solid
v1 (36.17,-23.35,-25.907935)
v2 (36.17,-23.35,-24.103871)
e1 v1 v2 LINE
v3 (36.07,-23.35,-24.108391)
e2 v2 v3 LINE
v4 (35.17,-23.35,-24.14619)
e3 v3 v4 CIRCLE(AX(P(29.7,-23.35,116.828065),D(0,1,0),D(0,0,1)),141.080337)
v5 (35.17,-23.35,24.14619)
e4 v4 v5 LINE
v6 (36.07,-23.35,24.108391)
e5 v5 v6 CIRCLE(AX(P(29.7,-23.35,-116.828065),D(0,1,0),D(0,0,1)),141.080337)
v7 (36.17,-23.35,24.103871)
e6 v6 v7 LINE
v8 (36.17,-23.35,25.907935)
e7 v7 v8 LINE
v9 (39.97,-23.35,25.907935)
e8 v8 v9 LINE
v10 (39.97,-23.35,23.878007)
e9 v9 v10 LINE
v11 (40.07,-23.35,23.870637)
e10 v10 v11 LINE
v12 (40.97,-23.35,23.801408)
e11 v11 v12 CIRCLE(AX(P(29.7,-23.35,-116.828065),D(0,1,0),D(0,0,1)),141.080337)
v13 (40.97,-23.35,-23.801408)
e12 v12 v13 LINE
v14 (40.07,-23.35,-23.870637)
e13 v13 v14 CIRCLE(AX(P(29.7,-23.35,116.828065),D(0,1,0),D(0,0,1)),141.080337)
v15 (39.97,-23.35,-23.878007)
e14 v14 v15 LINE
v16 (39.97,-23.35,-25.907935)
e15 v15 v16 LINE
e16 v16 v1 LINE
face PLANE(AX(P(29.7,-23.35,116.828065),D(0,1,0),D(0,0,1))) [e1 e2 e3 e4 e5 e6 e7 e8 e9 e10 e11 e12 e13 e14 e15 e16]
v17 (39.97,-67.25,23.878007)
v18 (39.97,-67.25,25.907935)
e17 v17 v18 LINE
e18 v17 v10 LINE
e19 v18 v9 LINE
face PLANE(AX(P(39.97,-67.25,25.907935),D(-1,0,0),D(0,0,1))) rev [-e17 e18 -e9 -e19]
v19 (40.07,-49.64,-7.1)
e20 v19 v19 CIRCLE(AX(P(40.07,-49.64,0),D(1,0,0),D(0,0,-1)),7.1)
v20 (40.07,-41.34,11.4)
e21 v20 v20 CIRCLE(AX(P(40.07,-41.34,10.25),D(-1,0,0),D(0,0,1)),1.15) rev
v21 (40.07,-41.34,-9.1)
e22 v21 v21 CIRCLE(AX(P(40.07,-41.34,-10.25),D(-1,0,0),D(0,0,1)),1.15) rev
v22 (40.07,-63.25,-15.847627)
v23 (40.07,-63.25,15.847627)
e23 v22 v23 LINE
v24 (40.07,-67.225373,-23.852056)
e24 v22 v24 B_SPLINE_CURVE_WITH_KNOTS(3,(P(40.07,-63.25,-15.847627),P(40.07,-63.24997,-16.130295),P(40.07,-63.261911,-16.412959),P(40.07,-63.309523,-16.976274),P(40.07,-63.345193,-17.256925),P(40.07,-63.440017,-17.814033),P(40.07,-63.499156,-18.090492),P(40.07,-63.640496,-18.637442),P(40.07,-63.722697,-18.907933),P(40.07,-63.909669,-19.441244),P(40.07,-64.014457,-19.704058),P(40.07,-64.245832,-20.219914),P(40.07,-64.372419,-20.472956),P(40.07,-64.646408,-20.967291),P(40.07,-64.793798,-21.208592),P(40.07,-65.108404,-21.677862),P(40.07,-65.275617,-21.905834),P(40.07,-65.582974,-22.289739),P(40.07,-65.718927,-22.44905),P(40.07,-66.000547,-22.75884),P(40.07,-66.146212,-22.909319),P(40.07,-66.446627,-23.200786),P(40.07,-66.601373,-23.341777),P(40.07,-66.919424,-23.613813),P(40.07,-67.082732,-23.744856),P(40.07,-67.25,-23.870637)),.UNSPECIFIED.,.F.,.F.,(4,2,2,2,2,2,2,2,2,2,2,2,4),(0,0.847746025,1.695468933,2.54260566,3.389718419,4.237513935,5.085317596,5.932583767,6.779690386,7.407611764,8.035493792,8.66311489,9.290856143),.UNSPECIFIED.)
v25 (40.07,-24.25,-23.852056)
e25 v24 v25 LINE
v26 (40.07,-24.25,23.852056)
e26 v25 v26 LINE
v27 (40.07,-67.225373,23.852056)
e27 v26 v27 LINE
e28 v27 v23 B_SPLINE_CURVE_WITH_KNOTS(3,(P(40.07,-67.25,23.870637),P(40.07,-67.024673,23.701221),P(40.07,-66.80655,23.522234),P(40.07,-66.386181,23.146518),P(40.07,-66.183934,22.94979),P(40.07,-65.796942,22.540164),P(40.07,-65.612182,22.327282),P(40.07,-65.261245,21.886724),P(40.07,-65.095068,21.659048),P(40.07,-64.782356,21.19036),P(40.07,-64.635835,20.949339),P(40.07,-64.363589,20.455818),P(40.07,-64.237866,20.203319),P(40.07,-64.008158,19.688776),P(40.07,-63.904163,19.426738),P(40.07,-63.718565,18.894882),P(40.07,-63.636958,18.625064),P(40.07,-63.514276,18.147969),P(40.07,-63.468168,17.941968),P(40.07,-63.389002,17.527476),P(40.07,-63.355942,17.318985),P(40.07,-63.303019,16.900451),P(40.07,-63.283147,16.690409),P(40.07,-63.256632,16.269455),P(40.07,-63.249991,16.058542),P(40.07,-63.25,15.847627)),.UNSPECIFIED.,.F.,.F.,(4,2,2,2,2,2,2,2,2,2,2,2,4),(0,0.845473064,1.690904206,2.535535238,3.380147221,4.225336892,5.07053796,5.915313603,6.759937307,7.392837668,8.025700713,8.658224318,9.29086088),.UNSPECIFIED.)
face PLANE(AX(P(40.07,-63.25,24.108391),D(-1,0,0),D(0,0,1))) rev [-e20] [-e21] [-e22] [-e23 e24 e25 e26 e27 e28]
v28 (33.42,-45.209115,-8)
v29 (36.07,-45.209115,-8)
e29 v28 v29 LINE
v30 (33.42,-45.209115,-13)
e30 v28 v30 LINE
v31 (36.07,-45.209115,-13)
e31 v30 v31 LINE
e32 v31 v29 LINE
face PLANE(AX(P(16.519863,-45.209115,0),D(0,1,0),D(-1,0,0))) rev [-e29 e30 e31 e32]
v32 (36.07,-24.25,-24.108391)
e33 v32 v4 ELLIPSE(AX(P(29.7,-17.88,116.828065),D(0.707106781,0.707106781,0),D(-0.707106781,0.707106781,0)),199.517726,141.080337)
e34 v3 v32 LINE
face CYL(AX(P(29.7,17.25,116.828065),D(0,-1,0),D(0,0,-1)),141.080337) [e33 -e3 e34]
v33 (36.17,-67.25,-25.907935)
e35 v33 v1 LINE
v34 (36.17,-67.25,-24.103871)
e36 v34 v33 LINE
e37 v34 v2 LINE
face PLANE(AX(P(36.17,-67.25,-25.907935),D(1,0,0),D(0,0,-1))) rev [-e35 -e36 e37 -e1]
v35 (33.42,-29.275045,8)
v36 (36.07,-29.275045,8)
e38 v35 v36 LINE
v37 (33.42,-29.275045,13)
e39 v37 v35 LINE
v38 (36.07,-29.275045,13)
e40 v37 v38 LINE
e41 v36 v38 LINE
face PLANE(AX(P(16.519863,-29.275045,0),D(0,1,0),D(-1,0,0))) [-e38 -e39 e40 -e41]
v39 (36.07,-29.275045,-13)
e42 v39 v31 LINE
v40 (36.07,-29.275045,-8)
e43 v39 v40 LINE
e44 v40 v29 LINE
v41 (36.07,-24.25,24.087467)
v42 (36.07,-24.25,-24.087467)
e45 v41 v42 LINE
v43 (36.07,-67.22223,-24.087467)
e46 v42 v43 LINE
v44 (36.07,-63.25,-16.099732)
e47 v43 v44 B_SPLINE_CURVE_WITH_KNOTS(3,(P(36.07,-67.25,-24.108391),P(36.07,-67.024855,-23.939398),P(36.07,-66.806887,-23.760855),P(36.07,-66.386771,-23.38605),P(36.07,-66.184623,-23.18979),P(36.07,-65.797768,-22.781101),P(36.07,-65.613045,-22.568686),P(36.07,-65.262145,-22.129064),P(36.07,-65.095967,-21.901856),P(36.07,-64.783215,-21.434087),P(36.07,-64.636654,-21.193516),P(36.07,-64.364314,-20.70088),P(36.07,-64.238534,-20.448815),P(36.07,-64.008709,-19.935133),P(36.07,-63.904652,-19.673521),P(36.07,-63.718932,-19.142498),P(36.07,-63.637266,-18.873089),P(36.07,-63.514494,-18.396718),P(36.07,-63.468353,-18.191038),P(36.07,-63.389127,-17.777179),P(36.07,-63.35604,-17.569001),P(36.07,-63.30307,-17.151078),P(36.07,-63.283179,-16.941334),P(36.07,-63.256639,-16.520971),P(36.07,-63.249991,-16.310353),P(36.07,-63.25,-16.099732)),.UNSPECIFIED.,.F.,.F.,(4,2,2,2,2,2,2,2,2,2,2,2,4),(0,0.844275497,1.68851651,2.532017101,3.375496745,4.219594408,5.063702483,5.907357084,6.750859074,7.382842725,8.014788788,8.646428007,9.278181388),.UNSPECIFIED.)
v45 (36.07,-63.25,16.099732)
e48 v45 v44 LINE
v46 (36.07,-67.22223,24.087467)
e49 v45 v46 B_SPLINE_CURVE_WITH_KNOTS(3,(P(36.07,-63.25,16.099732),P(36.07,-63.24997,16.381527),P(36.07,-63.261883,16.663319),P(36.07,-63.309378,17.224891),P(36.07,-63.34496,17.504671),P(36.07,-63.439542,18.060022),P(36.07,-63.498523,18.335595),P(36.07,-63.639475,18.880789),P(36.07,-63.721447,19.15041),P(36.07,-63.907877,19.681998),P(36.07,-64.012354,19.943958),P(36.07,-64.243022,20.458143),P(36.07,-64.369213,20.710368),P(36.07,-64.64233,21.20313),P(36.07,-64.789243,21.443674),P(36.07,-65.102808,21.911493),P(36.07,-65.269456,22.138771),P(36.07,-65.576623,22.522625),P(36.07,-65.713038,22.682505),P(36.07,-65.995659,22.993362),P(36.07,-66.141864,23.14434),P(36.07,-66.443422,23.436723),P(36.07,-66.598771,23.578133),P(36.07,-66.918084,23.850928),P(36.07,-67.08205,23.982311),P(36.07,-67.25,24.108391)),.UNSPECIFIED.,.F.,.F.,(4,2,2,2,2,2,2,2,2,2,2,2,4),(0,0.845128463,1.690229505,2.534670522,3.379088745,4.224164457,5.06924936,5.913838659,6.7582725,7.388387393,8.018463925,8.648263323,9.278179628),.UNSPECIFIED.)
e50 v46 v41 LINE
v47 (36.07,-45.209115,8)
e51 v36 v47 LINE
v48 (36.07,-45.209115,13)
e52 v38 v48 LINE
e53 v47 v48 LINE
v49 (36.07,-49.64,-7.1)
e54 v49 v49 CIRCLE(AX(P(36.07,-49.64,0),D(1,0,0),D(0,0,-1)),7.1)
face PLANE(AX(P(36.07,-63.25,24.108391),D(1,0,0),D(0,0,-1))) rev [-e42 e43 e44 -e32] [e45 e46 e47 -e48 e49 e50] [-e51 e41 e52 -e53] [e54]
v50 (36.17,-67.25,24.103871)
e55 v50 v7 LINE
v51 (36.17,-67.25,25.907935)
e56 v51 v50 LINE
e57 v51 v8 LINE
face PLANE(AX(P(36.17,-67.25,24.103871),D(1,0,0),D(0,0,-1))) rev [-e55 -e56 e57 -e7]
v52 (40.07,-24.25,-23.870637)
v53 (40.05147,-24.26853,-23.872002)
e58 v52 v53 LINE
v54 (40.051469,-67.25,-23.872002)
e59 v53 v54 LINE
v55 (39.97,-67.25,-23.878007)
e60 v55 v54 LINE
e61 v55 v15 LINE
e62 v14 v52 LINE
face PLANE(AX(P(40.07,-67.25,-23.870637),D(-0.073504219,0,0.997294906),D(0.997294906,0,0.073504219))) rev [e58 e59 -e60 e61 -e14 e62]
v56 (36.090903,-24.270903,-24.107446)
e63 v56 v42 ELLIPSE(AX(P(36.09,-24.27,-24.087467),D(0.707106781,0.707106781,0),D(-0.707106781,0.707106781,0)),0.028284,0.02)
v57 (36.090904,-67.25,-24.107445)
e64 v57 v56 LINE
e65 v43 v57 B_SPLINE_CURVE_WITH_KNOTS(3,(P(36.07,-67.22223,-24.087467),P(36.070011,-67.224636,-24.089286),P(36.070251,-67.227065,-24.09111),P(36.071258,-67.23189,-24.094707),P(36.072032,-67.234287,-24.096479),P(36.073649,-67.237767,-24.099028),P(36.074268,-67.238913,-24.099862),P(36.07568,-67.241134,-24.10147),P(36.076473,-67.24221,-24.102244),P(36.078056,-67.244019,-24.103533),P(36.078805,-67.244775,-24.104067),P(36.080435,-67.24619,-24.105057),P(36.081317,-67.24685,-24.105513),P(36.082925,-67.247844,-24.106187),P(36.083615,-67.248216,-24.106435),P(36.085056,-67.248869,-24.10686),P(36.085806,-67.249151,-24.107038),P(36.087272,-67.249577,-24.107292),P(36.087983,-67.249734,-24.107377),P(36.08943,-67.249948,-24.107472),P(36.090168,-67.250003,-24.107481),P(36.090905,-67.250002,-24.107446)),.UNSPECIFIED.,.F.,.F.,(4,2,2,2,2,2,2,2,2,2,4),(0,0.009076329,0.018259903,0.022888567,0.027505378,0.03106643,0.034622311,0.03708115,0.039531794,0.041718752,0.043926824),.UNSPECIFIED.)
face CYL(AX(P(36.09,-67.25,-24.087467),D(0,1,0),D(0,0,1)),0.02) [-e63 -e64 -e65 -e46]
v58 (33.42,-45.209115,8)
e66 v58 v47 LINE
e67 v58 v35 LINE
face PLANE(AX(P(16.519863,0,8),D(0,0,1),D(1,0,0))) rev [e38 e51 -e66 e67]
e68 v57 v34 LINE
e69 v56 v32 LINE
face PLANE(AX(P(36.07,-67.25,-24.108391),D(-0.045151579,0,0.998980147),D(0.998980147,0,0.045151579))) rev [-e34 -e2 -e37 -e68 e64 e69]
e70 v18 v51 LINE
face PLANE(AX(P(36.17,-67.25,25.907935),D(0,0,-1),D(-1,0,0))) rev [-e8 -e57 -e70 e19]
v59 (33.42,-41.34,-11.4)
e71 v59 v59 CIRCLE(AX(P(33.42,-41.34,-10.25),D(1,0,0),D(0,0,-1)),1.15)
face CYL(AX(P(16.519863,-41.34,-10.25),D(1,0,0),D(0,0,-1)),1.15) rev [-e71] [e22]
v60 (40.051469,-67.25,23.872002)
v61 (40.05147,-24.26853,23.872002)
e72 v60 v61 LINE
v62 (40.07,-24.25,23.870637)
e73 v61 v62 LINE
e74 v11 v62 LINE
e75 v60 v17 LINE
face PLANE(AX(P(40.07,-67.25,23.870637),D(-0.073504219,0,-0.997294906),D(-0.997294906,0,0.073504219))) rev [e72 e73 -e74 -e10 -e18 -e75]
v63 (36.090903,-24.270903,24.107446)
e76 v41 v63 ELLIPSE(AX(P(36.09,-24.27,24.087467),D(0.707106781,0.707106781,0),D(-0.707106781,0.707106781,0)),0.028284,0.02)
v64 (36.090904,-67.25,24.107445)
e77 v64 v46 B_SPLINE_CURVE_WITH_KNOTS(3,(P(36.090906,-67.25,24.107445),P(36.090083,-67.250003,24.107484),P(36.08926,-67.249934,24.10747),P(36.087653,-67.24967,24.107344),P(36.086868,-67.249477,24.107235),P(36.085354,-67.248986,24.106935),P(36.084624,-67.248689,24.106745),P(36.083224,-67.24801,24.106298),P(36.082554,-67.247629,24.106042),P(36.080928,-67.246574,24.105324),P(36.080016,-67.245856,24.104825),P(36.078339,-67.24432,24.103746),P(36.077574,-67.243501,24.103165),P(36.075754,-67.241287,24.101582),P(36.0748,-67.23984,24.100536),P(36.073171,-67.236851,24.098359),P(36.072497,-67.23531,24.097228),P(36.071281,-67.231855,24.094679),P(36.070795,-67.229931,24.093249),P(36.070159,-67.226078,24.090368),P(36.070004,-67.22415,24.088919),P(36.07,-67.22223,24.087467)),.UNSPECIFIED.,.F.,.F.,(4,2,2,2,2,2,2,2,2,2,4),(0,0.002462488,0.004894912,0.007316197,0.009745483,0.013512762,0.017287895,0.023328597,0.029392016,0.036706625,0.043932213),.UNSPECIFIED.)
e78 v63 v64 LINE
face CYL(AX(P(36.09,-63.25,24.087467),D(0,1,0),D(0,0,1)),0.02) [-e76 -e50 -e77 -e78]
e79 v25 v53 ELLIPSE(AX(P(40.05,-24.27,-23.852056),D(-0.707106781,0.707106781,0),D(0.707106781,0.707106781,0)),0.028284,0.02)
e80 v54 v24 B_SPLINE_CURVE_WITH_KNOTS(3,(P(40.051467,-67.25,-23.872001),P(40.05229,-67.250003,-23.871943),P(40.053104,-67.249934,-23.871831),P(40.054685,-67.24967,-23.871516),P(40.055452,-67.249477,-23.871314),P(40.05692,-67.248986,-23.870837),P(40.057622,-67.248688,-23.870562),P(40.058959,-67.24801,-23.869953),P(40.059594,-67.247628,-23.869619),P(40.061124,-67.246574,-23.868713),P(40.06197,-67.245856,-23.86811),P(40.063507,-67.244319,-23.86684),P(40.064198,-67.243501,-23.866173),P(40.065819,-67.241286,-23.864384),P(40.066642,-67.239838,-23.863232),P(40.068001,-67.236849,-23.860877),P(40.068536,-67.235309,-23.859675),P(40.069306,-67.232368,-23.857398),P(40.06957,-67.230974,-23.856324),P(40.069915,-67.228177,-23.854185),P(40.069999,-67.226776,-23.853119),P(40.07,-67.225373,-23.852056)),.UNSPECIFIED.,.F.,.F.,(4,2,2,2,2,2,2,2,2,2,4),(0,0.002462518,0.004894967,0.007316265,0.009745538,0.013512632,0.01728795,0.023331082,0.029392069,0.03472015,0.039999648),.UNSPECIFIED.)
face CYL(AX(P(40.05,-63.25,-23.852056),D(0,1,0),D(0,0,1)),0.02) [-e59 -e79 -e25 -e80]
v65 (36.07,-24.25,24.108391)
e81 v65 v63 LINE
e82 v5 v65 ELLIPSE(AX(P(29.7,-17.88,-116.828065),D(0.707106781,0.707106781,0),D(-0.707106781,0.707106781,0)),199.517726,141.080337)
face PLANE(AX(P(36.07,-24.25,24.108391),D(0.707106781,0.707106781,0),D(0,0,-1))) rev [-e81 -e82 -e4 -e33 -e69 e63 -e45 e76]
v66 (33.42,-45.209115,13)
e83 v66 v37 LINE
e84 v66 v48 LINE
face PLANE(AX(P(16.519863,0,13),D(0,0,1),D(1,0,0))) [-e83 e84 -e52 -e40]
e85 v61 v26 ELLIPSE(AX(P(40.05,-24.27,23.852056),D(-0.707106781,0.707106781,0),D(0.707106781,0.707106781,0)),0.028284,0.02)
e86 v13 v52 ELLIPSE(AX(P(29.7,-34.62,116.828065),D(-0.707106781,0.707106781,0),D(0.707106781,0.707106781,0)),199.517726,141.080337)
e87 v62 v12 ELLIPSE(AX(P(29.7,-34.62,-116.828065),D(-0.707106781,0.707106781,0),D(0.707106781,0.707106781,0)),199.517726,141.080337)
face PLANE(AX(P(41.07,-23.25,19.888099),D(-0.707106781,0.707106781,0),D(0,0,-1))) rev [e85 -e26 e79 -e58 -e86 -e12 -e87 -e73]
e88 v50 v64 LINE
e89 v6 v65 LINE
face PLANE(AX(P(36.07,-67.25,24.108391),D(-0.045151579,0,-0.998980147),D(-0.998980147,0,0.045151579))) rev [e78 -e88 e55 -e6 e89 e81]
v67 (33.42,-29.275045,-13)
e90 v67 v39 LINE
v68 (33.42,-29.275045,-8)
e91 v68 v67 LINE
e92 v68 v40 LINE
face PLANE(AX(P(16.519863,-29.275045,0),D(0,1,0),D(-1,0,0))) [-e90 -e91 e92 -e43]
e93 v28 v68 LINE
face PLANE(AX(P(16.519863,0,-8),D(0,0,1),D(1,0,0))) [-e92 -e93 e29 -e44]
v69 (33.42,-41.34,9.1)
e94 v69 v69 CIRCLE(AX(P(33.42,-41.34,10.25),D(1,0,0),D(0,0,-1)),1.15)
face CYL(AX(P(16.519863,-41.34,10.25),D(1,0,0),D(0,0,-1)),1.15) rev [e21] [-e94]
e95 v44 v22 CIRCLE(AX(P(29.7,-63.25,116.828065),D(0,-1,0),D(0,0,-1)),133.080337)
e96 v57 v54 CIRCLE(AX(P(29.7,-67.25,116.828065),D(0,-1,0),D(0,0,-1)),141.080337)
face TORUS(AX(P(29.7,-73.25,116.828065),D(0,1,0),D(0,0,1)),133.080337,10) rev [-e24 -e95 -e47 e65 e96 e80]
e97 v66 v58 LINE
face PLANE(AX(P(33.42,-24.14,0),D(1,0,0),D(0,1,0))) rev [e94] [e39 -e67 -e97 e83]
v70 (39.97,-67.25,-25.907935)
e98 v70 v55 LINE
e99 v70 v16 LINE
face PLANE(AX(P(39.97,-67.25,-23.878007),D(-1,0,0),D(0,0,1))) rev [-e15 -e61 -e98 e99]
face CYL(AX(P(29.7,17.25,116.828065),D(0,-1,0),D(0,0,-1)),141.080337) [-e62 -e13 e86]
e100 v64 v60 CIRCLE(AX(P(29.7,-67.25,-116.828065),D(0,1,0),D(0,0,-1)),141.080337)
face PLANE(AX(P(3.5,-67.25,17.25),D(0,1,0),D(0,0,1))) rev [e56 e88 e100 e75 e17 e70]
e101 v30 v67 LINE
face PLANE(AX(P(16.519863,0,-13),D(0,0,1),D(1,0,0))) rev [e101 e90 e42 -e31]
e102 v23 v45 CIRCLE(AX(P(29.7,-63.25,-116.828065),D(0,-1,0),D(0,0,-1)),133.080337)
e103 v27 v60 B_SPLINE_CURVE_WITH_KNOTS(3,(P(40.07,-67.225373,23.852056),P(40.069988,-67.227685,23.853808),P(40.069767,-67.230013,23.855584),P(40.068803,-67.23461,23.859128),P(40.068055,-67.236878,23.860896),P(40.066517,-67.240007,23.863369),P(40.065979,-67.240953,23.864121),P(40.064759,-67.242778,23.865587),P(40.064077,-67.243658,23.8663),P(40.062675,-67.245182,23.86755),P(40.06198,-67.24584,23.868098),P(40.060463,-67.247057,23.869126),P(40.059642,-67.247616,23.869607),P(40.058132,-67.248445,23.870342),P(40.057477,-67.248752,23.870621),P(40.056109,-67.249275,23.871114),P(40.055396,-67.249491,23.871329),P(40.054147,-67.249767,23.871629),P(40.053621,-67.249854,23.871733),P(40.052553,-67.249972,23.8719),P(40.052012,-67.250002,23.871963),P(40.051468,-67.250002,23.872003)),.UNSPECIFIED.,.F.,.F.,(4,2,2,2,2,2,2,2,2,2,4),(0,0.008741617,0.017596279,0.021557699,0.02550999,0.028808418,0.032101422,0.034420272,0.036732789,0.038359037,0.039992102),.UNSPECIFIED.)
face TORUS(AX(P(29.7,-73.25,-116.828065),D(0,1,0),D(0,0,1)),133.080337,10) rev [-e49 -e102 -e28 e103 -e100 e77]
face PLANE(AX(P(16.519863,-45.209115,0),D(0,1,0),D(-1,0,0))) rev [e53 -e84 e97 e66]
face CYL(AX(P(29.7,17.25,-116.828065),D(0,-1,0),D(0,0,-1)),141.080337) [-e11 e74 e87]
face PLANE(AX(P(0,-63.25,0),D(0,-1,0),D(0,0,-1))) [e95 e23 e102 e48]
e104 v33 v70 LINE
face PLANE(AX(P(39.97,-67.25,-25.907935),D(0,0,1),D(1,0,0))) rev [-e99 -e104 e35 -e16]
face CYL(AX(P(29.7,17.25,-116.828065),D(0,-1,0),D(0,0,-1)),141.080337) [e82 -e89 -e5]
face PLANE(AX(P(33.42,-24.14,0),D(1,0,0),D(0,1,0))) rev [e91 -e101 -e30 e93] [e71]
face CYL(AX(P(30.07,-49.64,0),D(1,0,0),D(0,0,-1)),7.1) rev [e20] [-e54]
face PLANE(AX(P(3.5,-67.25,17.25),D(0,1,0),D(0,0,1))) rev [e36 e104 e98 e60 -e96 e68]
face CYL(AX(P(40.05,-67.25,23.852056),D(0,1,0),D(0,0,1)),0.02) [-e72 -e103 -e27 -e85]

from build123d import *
from build123d.topology import SkipClean

# Parameters (mm, degrees)
SKETCH1_R                = 4.1
SKETCH1_R_2              = 1.15
BOSS_EXTRUDE1_DEPTH      = 3.5
BOSS_EXTRUDE2_DEPTH      = 67.25
CUT_EXTRUDE1_DEPTH       = 94.994268442
SKETCH4_W                = 26.5
SKETCH4_H                = 47.25
CUT_EXTRUDE2_DEPTH       = 3.5
SKETCH6_W                = 31.5
SKETCH6_H                = 52.25
BOSS_EXTRUDE3_DEPTH      = 2
CHAMFER2_SIZE            = 2
SKETCH7_W                = 26.5
SKETCH7_H                = 47.25
CUT_EXTRUDE3_DEPTH       = 0.8
CUT_EXTRUDE4_REACH       = 97.271
SKETCH8_W                = 21.401119101
SKETCH8_H                = 6.5
CUT_EXTRUDE5_REACH       = 97.271
SKETCH9_R                = 7.1
BOSS_EXTRUDE4_DEPTH      = 3.5
SKETCH11_W               = 4
SKETCH11_H               = 49.717369648
BOSS_EXTRUDE5_DEPTH      = 40
SKETCH12_R               = 7.1
CUT_EXTRUDE6_DEPTH       = 10
CHAMFER3_SIZE            = 1
CHAMFER4_SIZE            = 1
SKETCH13_R               = 9
SKETCH13_R_2             = 5.5
BOSS_EXTRUDE6_DEPTH      = 1.5
SKETCH16_R               = 9
BOSS_EXTRUDE7_DEPTH      = 1
FILLET2_R                = 1
SKETCH18_R               = 9
SKETCH18_R_2             = 7.1
BOSS_EXTRUDE8_DEPTH      = 0.5
CHAMFER5_SIZE            = 0.5
BOSS_EXTRUDE9_DEPTH      = 40.5
CUT_EXTRUDE8_REACH       = 129.458
CHAMFER6_SIZE            = 1.5
CUT_EXTRUDE9_REACH       = 129.458
SKETCH20_R               = 7.1
SKETCH21_R               = 1.5
BOSS_EXTRUDE10_DEPTH     = 3.5
CUT_EXTRUDE10_REACH      = 129.458
SKETCH22_R               = 3.75
SKETCH23_R               = 1.15
BOSS_EXTRUDE11_DEPTH     = 1.82
BOSS_EXTRUDE12_START     = 2.65
SKETCH24_W               = 5
SKETCH24_H               = 15.934069979
SKETCH24_R               = 1.15
BOSS_EXTRUDE12_DEPTH     = 2.65
CUT_EXTRUDE11_REACH      = 118.561
SKETCH25_R               = 1.15
SKETCH26_R               = 13.375
CUT_EXTRUDE12_DEPTH      = 3.3
SKETCH27_R               = 5
BOSS_EXTRUDE13_DEPTH     = 1
FILLET7_R                = 0.75
SKETCH28_R               = 8
SKETCH28_R_2             = 4.1
BOSS_EXTRUDE14_DEPTH     = 1.5
SKETCH29_R               = 8
SKETCH29_R_2             = 4.1
BOSS_EXTRUDE15_DEPTH     = 8.5
CUT_EXTRUDE13_DEPTH      = 15
CUT_EXTRUDE13_DEPTH_BACK = 127.447026853
SKETCH30_R               = 1.125
SKETCH31_R               = 7.1
BOSS_EXTRUDE16_DEPTH     = 0.5
CHAMFER7_SIZE            = 0.5
CHAMFER7_OF_MIRROR5_SIZE = 0.5
FILLET8_R                = 2.5
CUT_EXTRUDE14_DEPTH      = 10
CUT_EXTRUDE14_DEPTH_BACK = 10
SKETCH32_W               = 30.5
SKETCH32_H               = 23.22
FILLET9_R                = 5
CUT_EXTRUDE15_DEPTH      = 2
SKETCH34_R               = 2.25
CUT_EXTRUDE16_DEPTH      = 1.5
CUT_EXTRUDE17_DEPTH      = 133.651095359
CUT_EXTRUDE17_DEPTH_BACK = 2
SKETCH35_W               = 15
SKETCH35_H               = 21.75
FILLET10_R               = 1
FILLET11_R               = 1
SKETCH36_R               = 1.15
CUT_EXTRUDE18_DEPTH      = 127.188133357
CUT_EXTRUDE24_DEPTH      = 107.374679788
CUT_EXTRUDE24_DEPTH_BACK = 107.374679788
SKETCH39_W               = 129.097632358
SKETCH39_H               = 90.611923089
CUT_EXTRUDE25_DEPTH      = 69.011167635
CUT_EXTRUDE25_DEPTH_BACK = 3.5
SKETCH40_W               = 54.925006482
SKETCH40_H               = 71.748882342
CUT_EXTRUDE26_DEPTH      = 66.567961717
FILLET12_R               = 10
CUT_EXTRUDE27_DEPTH      = 0.1
FILLET13_R               = 0.02


# Some blends are built 0.0001 mm under size
with BuildPart() as part:
    # Sketch1 → Boss-Extrude1 (new body)
    with BuildSketch(Plane(origin=(0, 0, 0), x_dir=(0, 0, -1), z_dir=(1, 0, 0))):
        with BuildLine():
            Line((-17.25, 0), (-17.25, -67.25))
            Line((-17.25, -67.25), (17.25, -67.25))
            Line((17.25, -67.25), (17.25, 0))
            ThreePointArc((17.25, 0), (0, 17.25), (-17.25, 0))
        make_face()
        Circle(SKETCH1_R, mode=Mode.SUBTRACT)
        with Locations((0, 8.125)):
            Circle(SKETCH1_R_2, mode=Mode.SUBTRACT)
        with Locations((8.125, 0)):
            Circle(SKETCH1_R_2, mode=Mode.SUBTRACT)
        with Locations((-8.125, 0)):
            Circle(SKETCH1_R_2, mode=Mode.SUBTRACT)
        with Locations((0, -8.125)):
            Circle(SKETCH1_R_2, mode=Mode.SUBTRACT)
    boss_extrude1 = extrude(amount=BOSS_EXTRUDE1_DEPTH)

    # Sketch2 → Boss-Extrude2 (add)
    with BuildSketch(Plane(origin=(0, 0, 0), x_dir=(-1, 0, 0), z_dir=(0, -1, 0))):
        with BuildLine():
            Line((-59.4, -17.25), (-59.4, -20.25))
            ThreePointArc((-59.4, -20.25), (-58.989582055, -21.693064324), (-58.079872716, -22.886088403))
            ThreePointArc((-58.079872716, -22.886088403), (-54.454905265, -25.285822393), (-50.289145158, -26.529025904))
            ThreePointArc((-50.289145158, -26.529025904), (-40.020812264, -27.631788405), (-29.7, -28))
            ThreePointArc((-29.7, -28), (-19.379187736, -27.631788405), (-9.110854842, -26.529025904))
            ThreePointArc((-9.110854842, -26.529025904), (-4.945094735, -25.285822393), (-1.320127284, -22.886088403))
            ThreePointArc((-1.320127284, -22.886088403), (-0.410417945, -21.693064324), (0, -20.25))
            Line((0, -20.25), (0, -17.25))
            Line((0, -17.25), (-3.5, -17.25))
            Line((-3.5, -17.25), (-3.735903774, -19.954735321))
            ThreePointArc((-3.735903774, -19.954735321), (-3.770225997, -20.037754997), (-3.828562802, -20.106071165))
            ThreePointArc((-3.828562802, -20.106071165), (-6.407189742, -21.835001354), (-9.364778442, -22.779027613))
            ThreePointArc((-9.364778442, -22.779027613), (-19.505740765, -23.883479028), (-29.7, -24.2522722))
            ThreePointArc((-29.7, -24.2522722), (-39.894259235, -23.883479028), (-50.035221558, -22.779027613))
            ThreePointArc((-50.035221558, -22.779027613), (-52.992810258, -21.835001354), (-55.571437198, -20.106071165))
            ThreePointArc((-55.571437198, -20.106071165), (-55.629774003, -20.037754997), (-55.664096226, -19.954735321))
            Line((-55.664096226, -19.954735321), (-55.9, -17.25))
            Line((-55.9, -17.25), (-59.4, -17.25))
        make_face()
    boss_extrude2 = extrude(amount=BOSS_EXTRUDE2_DEPTH)

    # Mirror2: Boss-Extrude1 across plane
    add(boss_extrude1.mirror(Plane.ZY.offset(-29.7)))

    # Sketch3 → Cut-Extrude1 (cut, through all)
    with BuildSketch(Plane.ZY):
        Polygon((17.25, 0), (32.748612496, -8.948128097), (32.748612496, 0), align=None)
    cut_extrude1 = extrude(amount=-CUT_EXTRUDE1_DEPTH, mode=Mode.SUBTRACT)

    # Mirror3: Boss-Extrude2, Cut-Extrude1 across plane
    add(boss_extrude2.mirror(Plane(origin=(0, 0, 0), x_dir=(1, 0, 0), z_dir=(0, 0, -1))))
    add(cut_extrude1.mirror(Plane(origin=(0, 0, 0), x_dir=(1, 0, 0), z_dir=(0, 0, -1))), mode=Mode.SUBTRACT)

    # Sketch4 → Cut-Extrude2 (cut)
    with BuildSketch(Plane.ZY):
        with Locations((0, -37.125)):
            Rectangle(SKETCH4_W, SKETCH4_H)
    extrude(amount=-CUT_EXTRUDE2_DEPTH, mode=Mode.SUBTRACT)

    # Sketch6 → Boss-Extrude3 (add)
    with BuildSketch(Plane.ZY):
        with Locations((0, -37.125)):
            Rectangle(SKETCH6_W, SKETCH6_H)
    extrude(amount=BOSS_EXTRUDE3_DEPTH)

    # Chamfer2
    chamfer2_edges = [part.edges().sort_by_distance(p)[0] for p in [
        (-2, -63.25, 0),
        (-2, -37.125, 15.75),
        (-2, -37.125, -15.75),
        (-2, -11, 0),
    ]]
    chamfer(chamfer2_edges, length=CHAMFER2_SIZE - 0.0001)  # a hair under: the kernel refuses the full size

    # Sketch7 → Cut-Extrude3 (cut)
    with BuildSketch(Plane(origin=(0, 0, 0), x_dir=(0, 0, -1), z_dir=(1, 0, 0))):
        with Locations((0, -37.125)):
            Rectangle(SKETCH7_W, SKETCH7_H)
    extrude(amount=-CUT_EXTRUDE3_DEPTH, mode=Mode.SUBTRACT)

    # Sketch8 → Cut-Extrude4 (cut, up to next)
    with BuildSketch(Plane.ZY.offset(2), mode=Mode.PRIVATE) as cut_extrude4_sk1:
        with Locations((0.049440449, -35.5)):
            Rectangle(SKETCH8_W, SKETCH8_H)
    cut_extrude4_tool1 = extrude(cut_extrude4_sk1.sketch, amount=-CUT_EXTRUDE4_REACH, mode=Mode.PRIVATE) & part.part
    add(cut_extrude4_tool1.solids().sort_by_distance((-2, -35.5, 0.04944))[0], mode=Mode.SUBTRACT)

    # Sketch9 → Cut-Extrude5 (cut, up to next)
    with BuildSketch(Plane(origin=(59.4, 0, 0), x_dir=(0, 0, -1), z_dir=(1, 0, 0)), mode=Mode.PRIVATE) as cut_extrude5_sk1:
        with Locations((0, -49.64)):
            Circle(SKETCH9_R)
    cut_extrude5_tool1 = extrude(cut_extrude5_sk1.sketch, amount=-CUT_EXTRUDE5_REACH, mode=Mode.PRIVATE) & part.part
    add(cut_extrude5_tool1.solids().sort_by_distance((59.4, -49.64, 0))[0], mode=Mode.SUBTRACT)

    # Sketch10 → Boss-Extrude4 (add)
    with BuildSketch(Plane(origin=(0, -19.75, 0), x_dir=(-1, 0, 0), z_dir=(0, -1, 0))):
        with BuildLine():
            Line((-55.664096226, -19.954735321), (-55.9, -17.25))
            Line((-55.9, -17.25), (-55.9, 17.25))
            Line((-55.9, 17.25), (-55.664096226, 19.954735321))
            ThreePointArc((-55.664096226, 19.954735321), (-55.629774003, 20.037754997), (-55.571437198, 20.106071165))
            ThreePointArc((-55.571437198, 20.106071165), (-52.992810258, 21.835001354), (-50.035221558, 22.779027613))
            ThreePointArc((-50.035221558, 22.779027613), (-29.7, 24.2522722), (-9.364778442, 22.779027613))
            ThreePointArc((-9.364778442, 22.779027613), (-6.407189742, 21.835001354), (-3.828562802, 20.106071165))
            ThreePointArc((-3.828562802, 20.106071165), (-3.770225997, 20.037754997), (-3.735903774, 19.954735321))
            Line((-3.735903774, 19.954735321), (-3.5, 17.25))
            Line((-3.5, 17.25), (-3.5, 12.559999042))
            Line((-3.5, 12.559999042), (-34.519998723, 12.559999042))
            Line((-34.519998723, 12.559999042), (-34.519998723, -12.559999407))
            Line((-34.519998723, -12.559999407), (-3.5, -12.559999407))
            Line((-3.5, -12.559999407), (-3.5, -17.25))
            Line((-3.5, -17.25), (-3.735903774, -19.954735321))
            ThreePointArc((-3.735903774, -19.954735321), (-3.770225997, -20.037754997), (-3.828562802, -20.106071165))
            ThreePointArc((-3.828562802, -20.106071165), (-6.407189742, -21.835001354), (-9.364778442, -22.779027613))
            ThreePointArc((-9.364778442, -22.779027613), (-29.7, -24.2522722), (-50.035221558, -22.779027613))
            ThreePointArc((-50.035221558, -22.779027613), (-52.992810258, -21.835001354), (-55.571437198, -20.106071165))
            ThreePointArc((-55.571437198, -20.106071165), (-55.629774003, -20.037754997), (-55.664096226, -19.954735321))
        make_face()
    extrude(amount=BOSS_EXTRUDE4_DEPTH)

    # Sketch11 → Boss-Extrude5 (add)
    with BuildSketch(Plane(origin=(0, -23.25, 0), x_dir=(-1, 0, 0), z_dir=(0, -1, 0))):
        with Locations((-38.07, 0.750293773)):
            Rectangle(SKETCH11_W, SKETCH11_H)
    extrude(amount=BOSS_EXTRUDE5_DEPTH)

    # Sketch12 → Cut-Extrude6 (cut)
    with BuildSketch(Plane(origin=(40.07, 0, 0), x_dir=(0, 0, -1), z_dir=(1, 0, 0))):
        with Locations((0, -49.64)):
            Circle(SKETCH12_R)
    extrude(amount=-CUT_EXTRUDE6_DEPTH, mode=Mode.SUBTRACT)

    # Chamfer3
    chamfer3_edges = [part.edges().sort_by_distance(p)[0] for p in [
        (36.07, -23.25, 0),
    ]]
    chamfer(chamfer3_edges, length=CHAMFER3_SIZE)

    # Chamfer4
    chamfer4_edges = [part.edges().sort_by_distance(p)[0] for p in [
        (40.07, -23.25, 0),
    ]]
    chamfer(chamfer4_edges, length=CHAMFER4_SIZE)

    # Sketch13 → Boss-Extrude6 (add)
    with BuildSketch(Plane(origin=(59.4, 0, 0), x_dir=(0, 0, -1), z_dir=(1, 0, 0))):
        with Locations(Location((0, -49.64, 0), (0, 0, 180))):
            Circle(SKETCH13_R)
        with Locations((0, -49.64)):
            Circle(SKETCH13_R_2, mode=Mode.SUBTRACT)
    extrude(amount=BOSS_EXTRUDE6_DEPTH)

    # Sketch16 → Boss-Extrude7 (add)
    with BuildSketch(Plane(origin=(60.9, 0, 0), x_dir=(0, 0, -1), z_dir=(1, 0, 0))):
        with Locations(Location((0, -49.64, 0), (0, 0, 180))):
            Circle(SKETCH16_R)
    extrude(amount=BOSS_EXTRUDE7_DEPTH)

    # Fillet2
    fillet2_edges = [part.edges().sort_by_distance(p)[0] for p in [
        (61.9, -49.64, -9),
    ]]
    fillet(fillet2_edges, radius=FILLET2_R)

    # Sketch18 → Boss-Extrude8 (add)
    with BuildSketch(Plane.ZY.offset(-55.9)):
        with Locations((0, -49.64)):
            Circle(SKETCH18_R)
        with Locations(Location((0, -49.64, 0), (0, 0, 180))):
            Circle(SKETCH18_R_2, mode=Mode.SUBTRACT)
    extrude(amount=BOSS_EXTRUDE8_DEPTH)

    # Chamfer5
    chamfer5_edges = [part.edges().sort_by_distance(p)[0] for p in [
        (55.9, -49.64, -9),
    ]]
    chamfer(chamfer5_edges, length=CHAMFER5_SIZE - 0.0001)  # a hair under: the kernel refuses the full size

    # Sketch17 → Boss-Extrude9 (add)
    with BuildSketch(Plane(origin=(0, 0, 20.25), x_dir=(-1, 0, 0), z_dir=(0, 0, -1))):
        Polygon((-59.65, -105.91), (-63.15, -105.91), (-63.15, -67.5), (-59.4, -63.75), (-59.4, -67.25), (-55.9, -67.25), (-59.65, -71), align=None)
    boss_extrude9 = extrude(amount=BOSS_EXTRUDE9_DEPTH)

    # Sketch19 → Cut-Extrude8 (cut, up to next)
    with BuildSketch(Plane(origin=(63.15, 0, 0), x_dir=(0, 0, -1), z_dir=(1, 0, 0)), mode=Mode.PRIVATE) as cut_extrude8_sk1:
        with BuildLine():
            ThreePointArc((0, -105.91), (-12.515790027, -100.725790027), (-17.7, -88.21))
            Line((-17.7, -88.21), (-20.25, -85.66))
            Line((-20.25, -85.66), (-20.25, -105.91))
            Line((-20.25, -105.91), (0, -105.91))
        make_face()
    cut_extrude8_tool1 = extrude(cut_extrude8_sk1.sketch, amount=-CUT_EXTRUDE8_REACH, mode=Mode.PRIVATE) & part.part
    # Sketch19 → Cut-Extrude8 (cut, up to next)
    with BuildSketch(Plane(origin=(63.15, 0, 0), x_dir=(0, 0, -1), z_dir=(1, 0, 0)), mode=Mode.PRIVATE) as cut_extrude8_sk2:
        with BuildLine():
            ThreePointArc((17.7, -88.21), (12.515790027, -100.725790027), (0, -105.91))
            Line((0, -105.91), (20.25, -105.91))
            Line((20.25, -105.91), (20.25, -85.66))
            Line((20.25, -85.66), (17.7, -88.21))
        make_face()
    cut_extrude8_tool2 = extrude(cut_extrude8_sk2.sketch, amount=-CUT_EXTRUDE8_REACH, mode=Mode.PRIVATE) & part.part
    cut_extrude8_1 = cut_extrude8_tool1.solids().sort_by_distance((63.15, -99.634492, 15.946502))[0]
    add(cut_extrude8_1, mode=Mode.SUBTRACT)
    cut_extrude8_2 = cut_extrude8_tool2.solids().sort_by_distance((63.15, -99.634492, -15.946502))[0]
    add(cut_extrude8_2, mode=Mode.SUBTRACT)
    cut_extrude8 = cut_extrude8_1 + cut_extrude8_2  # Cut-Extrude8 as one shape, for the pattern or mirror that repeats it

    # Chamfer6
    chamfer6_edges = [part.edges().sort_by_distance(p)[0] for p in [
        (59.4, -49.64, -9),
    ]]
    chamfer(chamfer6_edges, length=CHAMFER6_SIZE - 0.0001)  # a hair under: the kernel refuses the full size

    # Sketch20 → Cut-Extrude9 (cut, up to next)
    with BuildSketch(Plane(origin=(63.15, 0, 0), x_dir=(0, 0, -1), z_dir=(1, 0, 0)), mode=Mode.PRIVATE) as cut_extrude9_sk1:
        with Locations(Location((0, -88.21, 0), (0, 0, 90))):
            Circle(SKETCH20_R)
    cut_extrude9_tool1 = extrude(cut_extrude9_sk1.sketch, amount=-CUT_EXTRUDE9_REACH, mode=Mode.PRIVATE) & part.part
    cut_extrude9 = cut_extrude9_tool1.solids().sort_by_distance((63.15, -88.21, 0))[0]
    add(cut_extrude9, mode=Mode.SUBTRACT)

    # Sketch21 → Boss-Extrude10 (add)
    with BuildSketch(Plane.ZY):
        with Locations((0, 8.125)):
            Circle(SKETCH21_R)
        with Locations((8.125, 0)):
            Circle(SKETCH21_R)
        with Locations((0, -8.125)):
            Circle(SKETCH21_R)
        with Locations((-8.125, 0)):
            Circle(SKETCH21_R)
    extrude(amount=-BOSS_EXTRUDE10_DEPTH)

    # Mirror4: Boss-Extrude9, Cut-Extrude8, Cut-Extrude9 across plane
    add(boss_extrude9.mirror(Plane.ZY.offset(-29.7)))
    add(cut_extrude8.mirror(Plane.ZY.offset(-29.7)), mode=Mode.SUBTRACT)
    add(cut_extrude9.mirror(Plane.ZY.offset(-29.7)), mode=Mode.SUBTRACT)

    # Sketch22 → Cut-Extrude10 (cut, up to next)
    with BuildSketch(Plane.ZY.offset(2), mode=Mode.PRIVATE) as cut_extrude10_sk1:
        with Locations((0, -49.64)):
            Circle(SKETCH22_R)
    cut_extrude10_tool1 = extrude(cut_extrude10_sk1.sketch, amount=-CUT_EXTRUDE10_REACH, mode=Mode.PRIVATE) & part.part
    add(cut_extrude10_tool1.solids().sort_by_distance((-2, -49.64, 0))[0], mode=Mode.SUBTRACT)

    # Sketch23 → Boss-Extrude11 (add)
    with BuildSketch(Plane(origin=(-0.8, 0, 0), x_dir=(0, 0, -1), z_dir=(1, 0, 0))):
        with BuildLine():
            Line((10.8, -38.889999996), (6.999999457, -38.890000068))
            Line((6.999999457, -38.890000068), (6.999996312, -40.653616778))
            ThreePointArc((6.999996312, -40.653616778), (8.489057136, -42.044544733), (9.706479797, -43.678516819))
            Line((9.706479797, -43.678516819), (11.359988862, -43.678515032))
            ThreePointArc((11.359988862, -43.678515032), (11.713588357, -43.532032852), (11.859995379, -43.178403539))
            Line((11.859995379, -43.178403539), (11.86002914, -16.529542904))
            add(Edge.make_bspline(
                [(11.86002914, -16.529542904), (11.860165313, -16.430469267), (11.850209846, -16.333113479), (11.811929636, -16.141528813), (11.783134355, -16.046307589), (11.707972993, -15.864777212), (11.661801756, -15.778752889), (11.553004371, -15.615785201), (11.48982416, -15.538574617), (11.282494862, -15.331229176), (11.115347595, -15.219447642), (10.754781823, -15.069949312), (10.558116563, -15.029804422), (10.360121847, -15.029962825)],
                knots=[0, 0, 0, 0, 0.125, 0.125, 0.25, 0.25, 0.375, 0.375, 0.5, 0.5, 0.75, 0.75, 1, 1, 1, 1], degree=3))
            Line((10.360121847, -15.029962825), (-10.360414785, -15.029965499))
            add(Edge.make_bspline(
                [(-10.360414785, -15.029965499), (-10.459488561, -15.029826786), (-10.556844718, -15.039779883), (-10.748430568, -15.078055492), (-10.843652616, -15.10684852), (-11.025185073, -15.18200551), (-11.111210651, -15.228174695), (-11.274181245, -15.336968247), (-11.351393467, -15.400146655), (-11.558744183, -15.60747118), (-11.670529896, -15.774615995), (-11.820037045, -16.135178663), (-11.86018697, -16.331843248), (-11.860032668, -16.529838302)],
                knots=[0, 0, 0, 0, 0.125, 0.125, 0.25, 0.25, 0.375, 0.375, 0.5, 0.5, 0.75, 0.75, 1, 1, 1, 1], degree=3))
            Line((-11.860032668, -16.529838302), (-11.860001151, -43.178485794))
            ThreePointArc((-11.860001151, -43.178485794), (-11.713562299, -43.532062592), (-11.359992206, -43.678517633))
            Line((-11.359992206, -43.678517633), (-9.706483935, -43.678519702))
            ThreePointArc((-9.706483935, -43.678519702), (-8.489059663, -42.044544533), (-6.999996328, -40.653614235))
            Line((-6.999996328, -40.653614235), (-6.99999946, -38.890000068))
            Line((-6.99999946, -38.890000068), (-10.8, -38.889999996))
            Line((-10.8, -38.889999996), (-10.8, -32.115))
            Line((-10.8, -32.115), (-9.303042913, -32.115))
            Line((-9.303042913, -32.115), (-9.442286694, -31.892101192))
            Line((-9.442286694, -31.892101192), (-9.442286694, -20.936914675))
            ThreePointArc((-9.442286694, -20.936914675), (-9.09081483, -20.088386539), (-8.242286694, -19.736914678))
            Line((-8.242286694, -19.736914678), (8.242286696, -19.736914678))
            ThreePointArc((8.242286696, -19.736914678), (9.090814832, -20.088386541), (9.442286694, -20.936914678))
            Line((9.442286694, -20.936914678), (9.442286694, -31.892101192))
            Line((9.442286694, -31.892101192), (9.303042913, -32.115))
            Line((9.303042913, -32.115), (10.8, -32.115))
            Line((10.8, -32.115), (10.8, -38.889999996))
        make_face()
        with Locations(Location((-10.25, -16.89, 0), (0, 0, 180))):
            Circle(SKETCH23_R, mode=Mode.SUBTRACT)
        with Locations(Location((10.25, -16.89, 0), (0, 0, 180))):
            Circle(SKETCH23_R, mode=Mode.SUBTRACT)
        with Locations(Location((10.25, -41.34, 0), (0, 0, 180))):
            Circle(SKETCH23_R, mode=Mode.SUBTRACT)
        with Locations(Location((-10.25, -41.34, 0), (0, 0, 180))):
            Circle(SKETCH23_R, mode=Mode.SUBTRACT)
    extrude(amount=BOSS_EXTRUDE11_DEPTH)

    # Sketch24 → Boss-Extrude12 (add)
    # profile 1 of 2: a face of its own
    with BuildSketch(Plane.ZY.offset(-36.07).offset(BOSS_EXTRUDE12_START)):
        with Locations((-10.5, -37.242079847)):
            Rectangle(SKETCH24_W, SKETCH24_H)
        with Locations((-10.25, -41.34)):
            Circle(SKETCH24_R, mode=Mode.SUBTRACT)
    # profile 2 of 2: a face of its own
    with BuildSketch(Plane.ZY.offset(-36.07).offset(BOSS_EXTRUDE12_START)):
        with Locations((10.5, -37.242079847)):
            Rectangle(SKETCH24_W, SKETCH24_H)
        with Locations((10.25, -41.34)):
            Circle(SKETCH24_R, mode=Mode.SUBTRACT)
    extrude(amount=-BOSS_EXTRUDE12_DEPTH)

    # Sketch25 → Cut-Extrude11 (cut, up to next)
    with BuildSketch(Plane.ZY.offset(-36.07), mode=Mode.PRIVATE) as cut_extrude11_sk1:
        with Locations((10.25, -41.34)):
            Circle(SKETCH25_R)
    cut_extrude11_tool1 = extrude(cut_extrude11_sk1.sketch, amount=-CUT_EXTRUDE11_REACH, mode=Mode.PRIVATE) & part.part
    # Sketch25 → Cut-Extrude11 (cut, up to next)
    with BuildSketch(Plane.ZY.offset(-36.07), mode=Mode.PRIVATE) as cut_extrude11_sk2:
        with Locations((-10.25, -41.34)):
            Circle(SKETCH25_R)
    cut_extrude11_tool2 = extrude(cut_extrude11_sk2.sketch, amount=-CUT_EXTRUDE11_REACH, mode=Mode.PRIVATE) & part.part
    add(cut_extrude11_tool1.solids().sort_by_distance((36.07, -41.34, 10.25))[0], mode=Mode.SUBTRACT)
    add(cut_extrude11_tool2.solids().sort_by_distance((36.07, -41.34, -10.25))[0], mode=Mode.SUBTRACT)

    # Sketch26 → Cut-Extrude12 (cut)
    with BuildSketch(Plane.ZY):
        Circle(SKETCH26_R)
    extrude(amount=CUT_EXTRUDE12_DEPTH, mode=Mode.SUBTRACT)

    # Sketch27 → Boss-Extrude13 (add)
    with BuildSketch(Plane.ZY.offset(2)):
        with Locations((0, -49.64)):
            Circle(SKETCH27_R)
    extrude(amount=BOSS_EXTRUDE13_DEPTH)

    # Fillet7
    fillet7_edges = [part.edges().sort_by_distance(p)[0] for p in [
        (-3, -49.64, -5),
    ]]
    fillet(fillet7_edges, radius=FILLET7_R)

    # Sketch28 → Boss-Extrude14 (add)
    with BuildSketch(Plane(origin=(3.5, 0, 0), x_dir=(0, 0, -1), z_dir=(1, 0, 0))):
        Circle(SKETCH28_R)
        Circle(SKETCH28_R_2, mode=Mode.SUBTRACT)
    extrude(amount=BOSS_EXTRUDE14_DEPTH)

    # Sketch29 → Boss-Extrude15 (add)
    with BuildSketch(Plane(origin=(5, 0, 0), x_dir=(0, 0, -1), z_dir=(1, 0, 0))):
        Circle(SKETCH29_R)
        Circle(SKETCH29_R_2, mode=Mode.SUBTRACT)
    extrude(amount=BOSS_EXTRUDE15_DEPTH)

    # Sketch30 → Cut-Extrude13 (cut, two sides: drawn at the far end of the back side and taken through both)
    with BuildSketch(Plane(origin=(0, 0, 0), x_dir=(-1, 0, 0), z_dir=(0, -1, 0)).offset(-CUT_EXTRUDE13_DEPTH_BACK)):
        with Locations(Location((-8.5, 0, 0), (0, 0, 270))):
            Circle(SKETCH30_R)
    extrude(amount=CUT_EXTRUDE13_DEPTH + CUT_EXTRUDE13_DEPTH_BACK, mode=Mode.SUBTRACT)

    # Sketch31 → Boss-Extrude16 (add)
    with SkipClean():  # the faces are left unmerged after this step: merging them gives an invalid solid
        with BuildSketch(Plane.ZY.offset(3.75)):
            with BuildLine():
                Line((-20.25, -67.5), (-20.25, -85.66))
                Line((-20.25, -85.66), (-17.7, -88.21))
                ThreePointArc((-17.7, -88.21), (0, -105.91), (17.7, -88.21))
                Line((17.7, -88.21), (20.25, -85.66))
                Line((20.25, -85.66), (20.25, -67.5))
                Line((20.25, -67.5), (-20.25, -67.5))
            make_face()
            with Locations(Location((0, -88.21, 0), (0, 0, 90))):
                Circle(SKETCH31_R, mode=Mode.SUBTRACT)
        boss_extrude16 = extrude(amount=BOSS_EXTRUDE16_DEPTH)

    # Chamfer7
    chamfer7_edges = [part.edges().sort_by_distance(p)[0] for p in [
        (-4.25, -67.5, 0),
    ]]
    chamfer(chamfer7_edges, length=CHAMFER7_SIZE - 0.0001)  # a hair under: the kernel refuses the full size

    # Mirror5: Boss-Extrude16 across plane
    add(boss_extrude16.mirror(Plane(origin=(29.7, 0, 0), x_dir=(0, 0, 1), z_dir=(1, 0, 0))))

    # Chamfer7 of Mirror5
    chamfer7_of_mirror5_edges = [part.edges().sort_by_distance(p)[0] for p in [
        (63.65, -67.5, 0),
    ]]
    chamfer(chamfer7_of_mirror5_edges, length=CHAMFER7_OF_MIRROR5_SIZE - 0.0001)  # a hair under: the kernel refuses the full size

    # Fillet8
    # the kernel refuses this fillet: 2.5 mm, written as the material it adds along each edge
    with BuildSketch(Plane(origin=(59.65, -71, 20.25), x_dir=(0, -1, 0), z_dir=(0, 0, -1)), Plane(origin=(-0.25, -71, 20.25), x_dir=(0.7071067811865557, 0.7071067811865394, 0), z_dir=(0, 0, -1))) as fillet8_piece_1:
        with BuildLine():
            CenterArc((FILLET8_R * 0.414213562373, FILLET8_R), FILLET8_R, 225, 45)
            Line((-FILLET8_R * 0.292893218813, FILLET8_R * 0.292893218813), (0, 0))
            Line((0, 0), (FILLET8_R * 0.414213562373, 0))
        make_face()
    extrude(amount=40.5)
    # the kernel refuses this fillet: 2.5 mm, written as the material it takes off along each edge
    with BuildSketch(Plane(origin=(-4.25, -67.9999, 22.838834765), x_dir=(0, -1, 0), z_dir=(0, 0, -1))) as fillet8_2_piece_1:
        with BuildLine():
            CenterArc((FILLET8_R * 0.414213562373, -FILLET8_R), FILLET8_R, 90, 45)
            Line((-FILLET8_R * 0.292893218813, -FILLET8_R * 0.292893218813), (0, 0))
            Line((0, 0), (FILLET8_R * 0.414213562373, 0))
        make_face()
    extrude(amount=45.67766953, mode=Mode.SUBTRACT)
    with BuildSketch(Plane(origin=(63.65, -67.9999, 22.838834765), x_dir=(0, -1, 0), z_dir=(0, 0, -1))) as fillet8_2_piece_2:
        with BuildLine():
            CenterArc((FILLET8_R * 0.414213562373, FILLET8_R), FILLET8_R, 225, 45)
            Line((-FILLET8_R * 0.292893218813, FILLET8_R * 0.292893218813), (0, 0))
            Line((0, 0), (FILLET8_R * 0.414213562373, 0))
        make_face()
    extrude(amount=45.67766953, mode=Mode.SUBTRACT)

    # Sketch32 → Cut-Extrude14 (cut, two sides: drawn at the far end of the back side and taken through both)
    with BuildSketch(Plane(origin=(59.4, 0, 0), x_dir=(0, 0, -1), z_dir=(1, 0, 0)).offset(-CUT_EXTRUDE14_DEPTH_BACK)):
        with Locations((0, -49.64)):
            Rectangle(SKETCH32_W, SKETCH32_H)
    extrude(amount=CUT_EXTRUDE14_DEPTH + CUT_EXTRUDE14_DEPTH_BACK, mode=Mode.SUBTRACT)

    # Fillet9
    fillet9_edges = [part.edges().sort_by_distance(p)[0] for p in [
        (57.65, -38.03, 15.25),
        (57.65, -61.25, 15.25),
        (57.65, -61.25, -15.25),
        (57.65, -38.03, -15.25),
    ]]
    fillet(fillet9_edges, radius=FILLET9_R)

    # Sketch33 → Cut-Extrude15 (cut)
    with BuildSketch(Plane(origin=(59.4, 0, 0), x_dir=(0, 0, -1), z_dir=(1, 0, 0))):
        with BuildLine():
            Line((-18.25, -56.25), (-16.75, -56.25))
            Line((-16.75, -56.25), (-16.75, -43.03))
            ThreePointArc((-16.75, -43.03), (-14.846194078, -38.433805922), (-10.25, -36.53))
            Line((-10.25, -36.53), (10.25, -36.53))
            ThreePointArc((10.25, -36.53), (14.846194078, -38.433805922), (16.75, -43.03))
            Line((16.75, -43.03), (16.75, -56.25))
            Line((16.75, -56.25), (18.25, -56.25))
            Line((18.25, -56.25), (18.25, -43.03))
            ThreePointArc((18.25, -43.03), (15.906854249, -37.373145751), (10.25, -35.03))
            Line((10.25, -35.03), (-10.25, -35.03))
            ThreePointArc((-10.25, -35.03), (-15.906854249, -37.373145751), (-18.25, -43.03))
            Line((-18.25, -43.03), (-18.25, -56.25))
        make_face()
    extrude(amount=-CUT_EXTRUDE15_DEPTH, mode=Mode.SUBTRACT)

    # Sketch34 → Cut-Extrude16 (cut)
    with BuildSketch(Plane(origin=(59.4, 0, 0), x_dir=(0, 0, -1), z_dir=(1, 0, 0))):
        with Locations((0, 8.125)):
            Circle(SKETCH34_R)
        with Locations((8.125, 0)):
            Circle(SKETCH34_R)
        with Locations((0, -8.125)):
            Circle(SKETCH34_R)
        with Locations((-8.125, 0)):
            Circle(SKETCH34_R)
    extrude(amount=-CUT_EXTRUDE16_DEPTH, mode=Mode.SUBTRACT)

    # Sketch35 → Cut-Extrude17 (cut, two sides: drawn at the far end of the back side and taken through both)
    with BuildSketch(Plane.XY.offset(20.25).offset(-CUT_EXTRUDE17_DEPTH_BACK)):
        with Locations((48.15, -8.875)):
            Rectangle(SKETCH35_W, SKETCH35_H)
    extrude(amount=CUT_EXTRUDE17_DEPTH + CUT_EXTRUDE17_DEPTH_BACK, mode=Mode.SUBTRACT)

    # Fillet10
    fillet10_edges = [part.edges().sort_by_distance(p)[0] for p in [
        (40.65, -12.858590015, 27.585458991),
        (55.65, -12.013821491, 24.659094982),
    ]]
    fillet(fillet10_edges, radius=FILLET10_R)

    # Fillet11
    fillet11_edges = [part.edges().sort_by_distance(p)[0] for p in [
        (40.65, -11.773525783, 23.826686232),
    ]]
    fillet(fillet11_edges, radius=FILLET11_R)

    # Sketch36 → Cut-Extrude18 (cut, through all)
    with BuildSketch(Plane(origin=(1.02, 0, 0), x_dir=(0, 0, -1), z_dir=(1, 0, 0))):
        with Locations(Location((10.25, -41.34, 0), (0, 0, 180))):
            Circle(SKETCH36_R)
        with Locations(Location((10.25, -16.89, 0), (0, 0, 180))):
            Circle(SKETCH36_R)
        with Locations(Location((-10.25, -16.89, 0), (0, 0, 180))):
            Circle(SKETCH36_R)
        with Locations(Location((-10.25, -41.34, 0), (0, 0, 180))):
            Circle(SKETCH36_R)
    extrude(amount=-CUT_EXTRUDE18_DEPTH, mode=Mode.SUBTRACT)

    # Sketch39 → Cut-Extrude24 (cut, two sides: drawn at the far end of the back side and taken through both)
    with BuildSketch(Plane.XZ.offset(63.25).offset(-CUT_EXTRUDE24_DEPTH_BACK)):
        with Locations((23.881285679, 9.548177142)):
            Rectangle(SKETCH39_W, SKETCH39_H)
        with BuildLine():
            Line((31.935379733, -24.234561595), (31.935379733, 24.234561595))
            ThreePointArc((31.935379733, 24.234561595), (34.003152314, 24.186630775), (36.07, 24.108391051))
            Line((36.07, 24.108391051), (36.07, 26.0079354))
            Line((36.07, 26.0079354), (40.07, 26.0079354))
            Line((40.07, 26.0079354), (40.07, 23.870636644))
            ThreePointArc((40.07, 23.870636644), (40.607246532, 23.830008061), (41.144333988, 23.787328054))
            Line((41.144333988, 23.787328054), (41.144333988, -23.787328054))
            ThreePointArc((41.144333988, -23.787328054), (40.607246532, -23.830008061), (40.07, -23.870636644))
            Line((40.07, -23.870636644), (40.07, -26.0079354))
            Line((40.07, -26.0079354), (36.07, -26.0079354))
            Line((36.07, -26.0079354), (36.07, -24.108391051))
            ThreePointArc((36.07, -24.108391051), (34.003152314, -24.186630775), (31.935379733, -24.234561595))
        make_face(mode=Mode.SUBTRACT)
    extrude(amount=CUT_EXTRUDE24_DEPTH + CUT_EXTRUDE24_DEPTH_BACK, mode=Mode.SUBTRACT)

    # Sketch40 → Cut-Extrude25 (cut, two sides: drawn at the far end of the back side and taken through both)
    with BuildSketch(Plane(origin=(0, -19.75, 0), x_dir=(1, 0, 0), z_dir=(0, 1, 0)).offset(-CUT_EXTRUDE25_DEPTH_BACK)):
        with Locations((39.101577686, 6.308953447)):
            Rectangle(SKETCH40_W, SKETCH40_H)
    extrude(amount=CUT_EXTRUDE25_DEPTH + CUT_EXTRUDE25_DEPTH_BACK, mode=Mode.SUBTRACT)

    # Sketch41 → Cut-Extrude26 (cut, through all)
    with BuildSketch(Plane(origin=(0, -23.25, 0), x_dir=(1, 0, 0), z_dir=(0, 1, 0))):
        Polygon((36.07, -24.108391051), (36.17, -24.103871284), (36.17, -25.9079354), (39.97, -25.9079354), (39.97, -23.878007003), (40.07, -23.870636644), (40.07, -26.0079354), (36.07, -26.0079354), align=None)
        Polygon((36.07, 24.108391051), (36.17, 24.103871284), (36.17, 25.9079354), (39.97, 25.9079354), (39.97, 23.878007003), (40.07, 23.870636644), (40.07, 26.0079354), (36.07, 26.0079354), align=None)
    extrude(amount=-CUT_EXTRUDE26_DEPTH, mode=Mode.SUBTRACT)

    # Fillet12
    # the kernel refuses this fillet: 10 mm, written as the material it adds along each edge
    with BuildSketch(Plane(origin=(29.7, -63.25, -116.828064758), x_dir=(-0.09644613300635278, 0, 0.9953382055503148), z_dir=(-0.9953382055503148, 0, -0.09644613300635278))) as fillet12_piece_1_section:
        with BuildLine():
            CenterArc((133.080336958, -10), FILLET12_R, 36.869897646, 53.130102354)
            Line((133.080336958, 0), (141.080336958, 0))
            Line((141.080336958, 0), (141.080336958, -4))
        make_face()
    fillet12_piece_1 = revolve(axis=Axis((29.7, -63.25, -116.828064758), (0, 1, 0)), revolution_arc=17.87227661, mode=Mode.PRIVATE)
    fillet12_piece_1 = split(fillet12_piece_1, bisect_by=Plane(origin=(40.07, -64.287839546, 20.472574235), z_dir=(-1, 0, 0)), keep=Keep.TOP, mode=Mode.PRIVATE)
    fillet12_piece_1 = split(fillet12_piece_1, bisect_by=Plane(origin=(36.07, -64.287839546, 20.472574235), z_dir=(1, 0, 0)), keep=Keep.TOP, mode=Mode.PRIVATE)
    add(fillet12_piece_1)
    with BuildSketch(Plane(origin=(29.7, -63.25, 116.828064758), x_dir=(0.21367351936506734, 0, -0.9769051269811957), z_dir=(0.9769051269811957, 0, 0.21367351936506734))) as fillet12_piece_2_section:
        with BuildLine():
            CenterArc((133.080336958, -10), FILLET12_R, 36.869897646, 53.130102354)
            Line((141.080336958, -4), (141.080336958, 0))
            Line((141.080336958, 0), (133.080336958, 0))
        make_face()
    fillet12_piece_2 = revolve(axis=Axis((29.7, -63.25, 116.828064758), (0, 1, 0)), revolution_arc=17.87227661, mode=Mode.PRIVATE)
    fillet12_piece_2 = split(fillet12_piece_2, bisect_by=Plane(origin=(40.07, -64.287839546, -20.472574235), z_dir=(-1, 0, 0)), keep=Keep.TOP, mode=Mode.PRIVATE)
    fillet12_piece_2 = split(fillet12_piece_2, bisect_by=Plane(origin=(36.07, -64.287839546, -20.472574235), z_dir=(1, 0, 0)), keep=Keep.TOP, mode=Mode.PRIVATE)
    add(fillet12_piece_2)

    # Sketch42 → Cut-Extrude27 (cut)
    with BuildSketch(Plane(origin=(0, -23.25, 0), x_dir=(1, 0, 0), z_dir=(0, 1, 0))):
        with BuildLine():
            Line((36.07, -24.108391051), (36.17, -24.103871284))
            Line((36.17, -24.103871284), (36.17, -25.9079354))
            Line((36.17, -25.9079354), (39.97, -25.9079354))
            Line((39.97, -25.9079354), (39.97, -23.878007003))
            Line((39.97, -23.878007003), (40.07, -23.870636644))
            ThreePointArc((40.07, -23.870636644), (40.570068675, -23.832886053), (41.07, -23.793358134))
            Line((41.07, -23.793358134), (41.07, 23.793358134))
            ThreePointArc((41.07, 23.793358134), (40.570068675, 23.832886053), (40.07, 23.870636644))
            Line((40.07, 23.870636644), (39.97, 23.878007003))
            Line((39.97, 23.878007003), (39.97, 25.9079354))
            Line((39.97, 25.9079354), (36.17, 25.9079354))
            Line((36.17, 25.9079354), (36.17, 24.103871284))
            Line((36.17, 24.103871284), (36.07, 24.108391051))
            ThreePointArc((36.07, 24.108391051), (35.570036929, 24.130099754), (35.07, 24.150034875))
            Line((35.07, 24.150034875), (35.07, -24.150034875))
            ThreePointArc((35.07, -24.150034875), (35.570036929, -24.130099754), (36.07, -24.108391051))
        make_face()
    extrude(amount=-CUT_EXTRUDE27_DEPTH, mode=Mode.SUBTRACT)

    # Fillet13
    fillet13_edges = [part.edges().sort_by_distance(p)[0] for p in [
        (40.07, -45.75, 23.870636644),
        (36.07, -45.75, 24.108391051),
        (36.07, -45.75, -24.108391051),
        (40.07, -45.75, -23.870636644),
    ]]
    fillet(fillet13_edges, radius=FILLET13_R)


solid = part.part
